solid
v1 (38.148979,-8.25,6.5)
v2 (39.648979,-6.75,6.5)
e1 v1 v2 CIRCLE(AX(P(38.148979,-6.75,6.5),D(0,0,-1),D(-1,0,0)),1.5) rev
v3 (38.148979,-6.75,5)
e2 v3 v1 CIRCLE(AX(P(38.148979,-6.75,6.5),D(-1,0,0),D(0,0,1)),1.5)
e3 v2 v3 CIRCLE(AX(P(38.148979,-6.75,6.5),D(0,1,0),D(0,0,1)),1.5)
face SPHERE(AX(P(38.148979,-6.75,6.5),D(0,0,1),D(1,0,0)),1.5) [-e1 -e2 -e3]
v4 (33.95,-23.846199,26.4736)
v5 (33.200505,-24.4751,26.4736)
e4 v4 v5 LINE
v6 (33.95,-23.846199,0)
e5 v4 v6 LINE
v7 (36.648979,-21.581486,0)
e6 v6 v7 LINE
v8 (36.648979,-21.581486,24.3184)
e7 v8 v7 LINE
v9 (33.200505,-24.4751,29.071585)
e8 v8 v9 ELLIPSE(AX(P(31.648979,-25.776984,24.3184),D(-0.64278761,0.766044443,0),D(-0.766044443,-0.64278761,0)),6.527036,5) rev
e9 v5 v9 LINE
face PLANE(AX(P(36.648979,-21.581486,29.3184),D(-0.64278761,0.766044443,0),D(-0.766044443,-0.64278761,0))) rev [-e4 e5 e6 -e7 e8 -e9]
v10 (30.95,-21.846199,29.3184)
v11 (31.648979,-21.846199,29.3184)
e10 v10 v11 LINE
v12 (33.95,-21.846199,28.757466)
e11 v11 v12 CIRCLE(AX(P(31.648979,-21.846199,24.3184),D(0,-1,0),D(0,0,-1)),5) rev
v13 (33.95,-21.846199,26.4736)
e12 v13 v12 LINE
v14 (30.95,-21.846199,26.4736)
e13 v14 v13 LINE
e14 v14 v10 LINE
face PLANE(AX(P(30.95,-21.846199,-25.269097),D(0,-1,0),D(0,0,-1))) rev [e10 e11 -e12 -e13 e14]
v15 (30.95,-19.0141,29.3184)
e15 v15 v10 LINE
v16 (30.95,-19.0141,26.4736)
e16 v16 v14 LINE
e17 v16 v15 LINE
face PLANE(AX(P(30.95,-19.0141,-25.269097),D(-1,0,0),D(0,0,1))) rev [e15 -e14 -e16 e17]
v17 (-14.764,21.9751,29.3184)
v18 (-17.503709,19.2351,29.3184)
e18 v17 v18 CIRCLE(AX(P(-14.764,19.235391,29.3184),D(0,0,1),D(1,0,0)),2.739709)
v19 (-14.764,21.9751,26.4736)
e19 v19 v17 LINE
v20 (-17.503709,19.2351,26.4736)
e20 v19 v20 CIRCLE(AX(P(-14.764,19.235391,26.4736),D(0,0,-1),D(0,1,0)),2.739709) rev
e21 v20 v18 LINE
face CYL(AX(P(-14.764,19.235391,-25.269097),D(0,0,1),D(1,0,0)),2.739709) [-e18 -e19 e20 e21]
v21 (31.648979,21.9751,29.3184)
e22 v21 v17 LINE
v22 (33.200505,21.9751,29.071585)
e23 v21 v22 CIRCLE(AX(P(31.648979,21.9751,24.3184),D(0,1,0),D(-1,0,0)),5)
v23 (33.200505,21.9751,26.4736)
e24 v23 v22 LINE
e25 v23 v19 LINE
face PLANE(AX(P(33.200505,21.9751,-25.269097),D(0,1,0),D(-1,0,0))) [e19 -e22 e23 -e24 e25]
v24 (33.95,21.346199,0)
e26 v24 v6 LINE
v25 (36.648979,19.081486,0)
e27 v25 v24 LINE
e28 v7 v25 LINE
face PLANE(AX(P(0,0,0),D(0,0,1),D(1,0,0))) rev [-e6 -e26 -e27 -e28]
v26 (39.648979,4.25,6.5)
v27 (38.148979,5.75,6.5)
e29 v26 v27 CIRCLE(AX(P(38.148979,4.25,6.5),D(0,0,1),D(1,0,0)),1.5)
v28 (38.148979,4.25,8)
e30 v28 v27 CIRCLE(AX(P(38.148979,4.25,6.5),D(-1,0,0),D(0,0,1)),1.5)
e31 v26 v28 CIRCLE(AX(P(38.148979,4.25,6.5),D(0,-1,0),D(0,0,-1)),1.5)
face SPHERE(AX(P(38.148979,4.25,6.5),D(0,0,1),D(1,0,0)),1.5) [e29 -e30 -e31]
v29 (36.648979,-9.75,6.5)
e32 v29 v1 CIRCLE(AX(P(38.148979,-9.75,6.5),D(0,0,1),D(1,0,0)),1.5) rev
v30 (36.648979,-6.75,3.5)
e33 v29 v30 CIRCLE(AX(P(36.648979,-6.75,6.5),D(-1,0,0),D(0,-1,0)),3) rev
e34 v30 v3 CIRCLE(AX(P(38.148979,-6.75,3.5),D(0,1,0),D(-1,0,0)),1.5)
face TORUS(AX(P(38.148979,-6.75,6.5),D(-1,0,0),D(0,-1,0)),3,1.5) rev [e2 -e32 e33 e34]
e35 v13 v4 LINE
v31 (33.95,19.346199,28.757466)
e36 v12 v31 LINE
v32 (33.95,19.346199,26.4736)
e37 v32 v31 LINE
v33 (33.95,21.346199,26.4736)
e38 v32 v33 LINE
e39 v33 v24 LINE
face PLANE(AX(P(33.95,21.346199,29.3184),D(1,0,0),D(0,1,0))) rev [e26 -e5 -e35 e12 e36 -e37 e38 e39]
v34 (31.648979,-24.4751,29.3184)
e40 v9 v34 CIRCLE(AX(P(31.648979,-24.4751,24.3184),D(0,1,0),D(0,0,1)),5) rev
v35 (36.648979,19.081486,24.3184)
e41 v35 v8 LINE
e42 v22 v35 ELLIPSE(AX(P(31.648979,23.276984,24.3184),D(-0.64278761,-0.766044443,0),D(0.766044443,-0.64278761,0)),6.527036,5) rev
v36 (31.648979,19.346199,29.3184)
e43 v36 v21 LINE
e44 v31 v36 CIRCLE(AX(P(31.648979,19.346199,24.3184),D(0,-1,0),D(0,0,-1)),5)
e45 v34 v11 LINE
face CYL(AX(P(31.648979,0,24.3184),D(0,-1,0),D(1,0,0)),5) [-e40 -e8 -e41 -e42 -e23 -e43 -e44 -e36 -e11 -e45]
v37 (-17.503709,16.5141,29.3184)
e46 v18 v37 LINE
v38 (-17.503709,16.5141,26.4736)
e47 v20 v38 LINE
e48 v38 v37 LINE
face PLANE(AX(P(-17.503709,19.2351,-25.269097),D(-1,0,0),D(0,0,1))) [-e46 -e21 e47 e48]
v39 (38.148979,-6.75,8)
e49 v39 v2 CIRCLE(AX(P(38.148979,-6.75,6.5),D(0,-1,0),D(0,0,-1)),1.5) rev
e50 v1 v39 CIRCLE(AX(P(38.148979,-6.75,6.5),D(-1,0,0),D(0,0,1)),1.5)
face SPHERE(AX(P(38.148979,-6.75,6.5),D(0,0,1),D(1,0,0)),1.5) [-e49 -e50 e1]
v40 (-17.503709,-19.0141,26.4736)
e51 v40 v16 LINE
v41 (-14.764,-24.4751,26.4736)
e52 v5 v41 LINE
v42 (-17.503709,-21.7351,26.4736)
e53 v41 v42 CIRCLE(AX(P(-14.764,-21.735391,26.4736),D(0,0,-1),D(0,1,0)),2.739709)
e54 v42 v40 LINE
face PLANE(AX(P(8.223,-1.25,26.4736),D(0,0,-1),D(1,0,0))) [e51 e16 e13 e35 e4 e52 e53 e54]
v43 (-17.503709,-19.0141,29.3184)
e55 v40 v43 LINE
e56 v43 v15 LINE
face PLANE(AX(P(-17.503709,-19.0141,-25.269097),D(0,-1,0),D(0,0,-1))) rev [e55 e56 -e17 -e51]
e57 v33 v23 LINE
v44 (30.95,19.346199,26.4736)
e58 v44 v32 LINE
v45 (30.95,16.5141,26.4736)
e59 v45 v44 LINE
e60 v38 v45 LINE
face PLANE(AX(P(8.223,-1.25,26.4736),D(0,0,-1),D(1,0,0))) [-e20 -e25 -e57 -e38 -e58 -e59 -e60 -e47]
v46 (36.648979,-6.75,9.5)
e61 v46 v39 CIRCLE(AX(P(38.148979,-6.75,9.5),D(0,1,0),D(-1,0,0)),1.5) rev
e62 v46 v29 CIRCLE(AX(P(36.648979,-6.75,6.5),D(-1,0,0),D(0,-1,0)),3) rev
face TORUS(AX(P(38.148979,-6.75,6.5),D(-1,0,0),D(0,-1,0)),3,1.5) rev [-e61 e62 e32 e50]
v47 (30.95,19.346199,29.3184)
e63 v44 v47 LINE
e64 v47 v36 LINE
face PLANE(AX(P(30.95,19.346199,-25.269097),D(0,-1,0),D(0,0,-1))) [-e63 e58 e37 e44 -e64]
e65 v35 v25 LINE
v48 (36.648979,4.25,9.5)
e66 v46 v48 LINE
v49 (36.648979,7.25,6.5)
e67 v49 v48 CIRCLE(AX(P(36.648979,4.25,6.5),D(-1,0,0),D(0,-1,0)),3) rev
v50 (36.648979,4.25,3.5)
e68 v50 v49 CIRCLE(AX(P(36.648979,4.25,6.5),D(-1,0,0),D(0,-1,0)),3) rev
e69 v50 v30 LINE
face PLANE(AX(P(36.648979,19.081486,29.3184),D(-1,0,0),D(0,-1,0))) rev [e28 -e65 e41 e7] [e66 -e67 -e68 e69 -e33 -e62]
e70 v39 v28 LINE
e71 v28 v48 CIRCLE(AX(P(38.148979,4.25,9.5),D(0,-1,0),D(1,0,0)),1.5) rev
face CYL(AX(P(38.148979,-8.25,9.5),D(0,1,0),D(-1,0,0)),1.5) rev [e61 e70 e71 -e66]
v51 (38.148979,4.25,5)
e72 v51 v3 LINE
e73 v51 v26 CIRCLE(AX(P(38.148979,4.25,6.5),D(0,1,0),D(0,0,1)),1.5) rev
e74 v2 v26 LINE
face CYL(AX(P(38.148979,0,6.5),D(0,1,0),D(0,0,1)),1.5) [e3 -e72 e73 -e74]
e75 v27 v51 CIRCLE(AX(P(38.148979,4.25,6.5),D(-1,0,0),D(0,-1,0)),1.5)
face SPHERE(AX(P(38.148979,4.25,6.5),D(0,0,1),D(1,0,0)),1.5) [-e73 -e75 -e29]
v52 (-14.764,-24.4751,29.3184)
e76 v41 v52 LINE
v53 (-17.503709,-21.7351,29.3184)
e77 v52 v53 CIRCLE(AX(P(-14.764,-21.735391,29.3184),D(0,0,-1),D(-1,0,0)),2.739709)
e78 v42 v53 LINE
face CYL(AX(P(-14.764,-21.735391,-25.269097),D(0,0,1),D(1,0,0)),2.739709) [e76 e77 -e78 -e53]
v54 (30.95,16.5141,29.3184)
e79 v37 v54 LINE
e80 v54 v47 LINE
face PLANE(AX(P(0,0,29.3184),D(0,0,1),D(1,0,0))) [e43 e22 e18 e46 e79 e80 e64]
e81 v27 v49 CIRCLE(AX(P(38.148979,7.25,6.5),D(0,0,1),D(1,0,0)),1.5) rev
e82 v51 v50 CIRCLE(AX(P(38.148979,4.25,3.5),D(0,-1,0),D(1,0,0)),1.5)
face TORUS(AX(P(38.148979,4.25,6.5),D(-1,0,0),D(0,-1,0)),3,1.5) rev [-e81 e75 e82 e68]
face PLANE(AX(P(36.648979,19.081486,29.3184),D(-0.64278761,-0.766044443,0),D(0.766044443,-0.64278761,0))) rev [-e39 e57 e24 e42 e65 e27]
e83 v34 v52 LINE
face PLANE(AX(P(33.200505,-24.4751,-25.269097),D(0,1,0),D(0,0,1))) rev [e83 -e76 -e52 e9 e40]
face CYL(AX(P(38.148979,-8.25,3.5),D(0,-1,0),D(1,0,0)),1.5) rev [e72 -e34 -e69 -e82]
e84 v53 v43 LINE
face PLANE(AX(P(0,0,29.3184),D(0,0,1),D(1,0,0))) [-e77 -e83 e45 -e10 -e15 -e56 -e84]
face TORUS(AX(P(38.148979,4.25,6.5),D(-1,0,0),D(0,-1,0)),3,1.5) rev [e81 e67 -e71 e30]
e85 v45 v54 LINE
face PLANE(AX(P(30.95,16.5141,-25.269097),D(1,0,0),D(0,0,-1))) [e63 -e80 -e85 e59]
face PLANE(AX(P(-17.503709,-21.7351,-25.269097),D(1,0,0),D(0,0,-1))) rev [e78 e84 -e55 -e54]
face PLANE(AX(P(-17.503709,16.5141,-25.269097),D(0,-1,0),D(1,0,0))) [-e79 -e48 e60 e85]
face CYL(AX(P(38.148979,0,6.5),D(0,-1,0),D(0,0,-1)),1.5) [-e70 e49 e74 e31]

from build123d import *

# Parameters (mm, degrees)
BOSS_EXTRUDE1_DEPTH = 29.3184
BOSS_EXTRUDE2_DEPTH = 2.8448
FILLET1_R           = 5
SKETCH3_W           = 3
SKETCH3_H           = 14
BOSS_EXTRUDE3_DEPTH = 3
FILLET2_R           = 1.5
FILLET3_R           = 1.5


# Some blends are built 0.0001 mm under size
with BuildPart() as part:
    # Sketch1 → Boss-Extrude1 (new body)
    with BuildSketch(Plane.XY):
        Polygon((33.95, 21.346198616), (33.95, -23.846198616), (36.648979486, -21.581485925), (36.648979486, -1.25), (36.648979486, 19.081485925), align=None)
    extrude(amount=BOSS_EXTRUDE1_DEPTH)

    # Sketch2 → Boss-Extrude2 (add)
    with BuildSketch(Plane.XY.offset(29.3184)):
        with BuildLine():
            Line((33.95, -21.846198616), (33.95, -23.846198616))
            Line((33.95, -23.846198616), (33.200504516, -24.4751))
            Line((33.200504516, -24.4751), (-14.764, -24.4751))
            ThreePointArc((-14.764, -24.4751), (-16.701369719, -23.67255493), (-17.503709057, -21.7351))
            Line((-17.503709057, -21.7351), (-17.503709057, -19.0141))
            Line((-17.503709057, -19.0141), (30.95, -19.0141))
            Line((30.95, -19.0141), (30.95, -21.846198616))
            Line((30.95, -21.846198616), (33.95, -21.846198616))
        make_face()
        with BuildLine():
            Line((30.95, 19.346198616), (33.95, 19.346198616))
            Line((33.95, 19.346198616), (33.95, 21.346198616))
            Line((33.95, 21.346198616), (33.200504516, 21.9751))
            Line((33.200504516, 21.9751), (-14.764, 21.9751))
            ThreePointArc((-14.764, 21.9751), (-16.701369719, 21.17255493), (-17.503709057, 19.2351))
            Line((-17.503709057, 19.2351), (-17.503709057, 16.5141))
            Line((-17.503709057, 16.5141), (30.95, 16.5141))
            Line((30.95, 16.5141), (30.95, 19.346198616))
        make_face()
    extrude(amount=-BOSS_EXTRUDE2_DEPTH)

    # Fillet1
    # the kernel refuses this fillet: 5 mm, written as the material it takes off along each edge
    with BuildSketch(Plane(origin=(36.648979486, 31.581485925, 29.3184), x_dir=(0, 0, -1), z_dir=(0, -1, 0))) as fillet1_piece_1:
        with BuildLine():
            CenterArc((FILLET1_R, -FILLET1_R), FILLET1_R, 90, 90)
            Line((0, -FILLET1_R), (0, 0))
            Line((0, 0), (FILLET1_R, 0))
        make_face()
    extrude(amount=65.66297185, mode=Mode.SUBTRACT)

    # Sketch3 → Boss-Extrude3 (add)
    with BuildSketch(Plane(origin=(36.648979486, 0, 0), x_dir=(0, 0, -1), z_dir=(1, 0, 0))):
        with Locations((-6.5, -1.25)):
            Rectangle(SKETCH3_W, SKETCH3_H)
    extrude(amount=BOSS_EXTRUDE3_DEPTH)

    # Fillet2
    fillet2_edges = [part.edges().sort_by_distance(p)[0] for p in [
        (39.648979486, -1.25, 8),
        (39.648979486, -8.25, 6.5),
        (39.648979486, -1.25, 5),
        (39.648979486, 5.75, 6.5),
    ]]
    fillet(fillet2_edges, radius=FILLET2_R - 0.0001)  # a hair under: the kernel refuses the full size

    # Fillet3
    # the kernel refuses this fillet: 1.5 mm, written as the material it takes off along each edge
    with BuildSketch(Plane(origin=(39.648979486, -6.75, 6.5), x_dir=(0, -1, 0), z_dir=(0, 0, 1))) as fillet3_piece_1:
        with BuildLine():
            CenterArc((0.0001, -1.4999), 1.4999, 0, 90)
            Line((1.5, -1.4999), (1.5, 0))
            Line((1.5, 0), (0.0001, 0))
        make_face()
    revolve(axis=Axis((39.648979486, -6.75, 6.5), (1, 0, 0)), revolution_arc=90, mode=Mode.SUBTRACT)
    with BuildSketch(Plane(origin=(39.648979486, -6.75, 6.5), x_dir=(0, 0, 1), z_dir=(0, 1, 0))) as fillet3_piece_2:
        with BuildLine():
            CenterArc((0.0001, -1.4999), 1.4999, 0, 90)
            Line((1.5, -1.4999), (1.5, 0))
            Line((1.5, 0), (0.0001, 0))
        make_face()
    revolve(axis=Axis((39.648979486, -6.75, 6.5), (1, 0, 0)), revolution_arc=90, mode=Mode.SUBTRACT)
    with BuildSketch(Plane(origin=(39.648979486, 4.25, 6.5), x_dir=(0, 0, -1), z_dir=(0, -1, 0))) as fillet3_piece_3:
        with BuildLine():
            CenterArc((0.0001, -1.4999), 1.4999, 0, 90)
            Line((1.5, -1.4999), (1.5, 0))
            Line((1.5, 0), (0.0001, 0))
        make_face()
    revolve(axis=Axis((39.648979486, 4.25, 6.5), (1, 0, 0)), revolution_arc=90, mode=Mode.SUBTRACT)
    with BuildSketch(Plane(origin=(39.648979486, 4.25, 6.5), x_dir=(0, 1, 0), z_dir=(0, 0, -1))) as fillet3_piece_4:
        with BuildLine():
            CenterArc((0.0001, -1.4999), 1.4999, 0, 90)
            Line((1.5, -1.4999), (1.5, 0))
            Line((1.5, 0), (0.0001, 0))
        make_face()
    revolve(axis=Axis((39.648979486, 4.25, 6.5), (1, 0, 0)), revolution_arc=90, mode=Mode.SUBTRACT)
    with BuildSketch(Plane(origin=(36.648979486, 5.75, 8), x_dir=(0, -1, 0), z_dir=(1, 0, 0)), Plane(origin=(36.648979486, 5.75, 5), x_dir=(0, 0, 1), z_dir=(1, 0, 0))) as fillet3_piece_5:
        with BuildLine():
            CenterArc((FILLET3_R, FILLET3_R), FILLET3_R, 180, 90)
            Line((0, FILLET3_R), (-FILLET3_R * 0.02, FILLET3_R))
            Line((-FILLET3_R * 0.02, FILLET3_R), (-FILLET3_R * 0.02, -FILLET3_R * 0.02))
            Line((-FILLET3_R * 0.02, -FILLET3_R * 0.02), (FILLET3_R, -FILLET3_R * 0.02))
            Line((FILLET3_R, -FILLET3_R * 0.02), (FILLET3_R, 0))
        make_face()
    extrude(amount=3, mode=Mode.SUBTRACT)
    with BuildSketch(Plane(origin=(36.648979486, -8.25, 5), x_dir=(0, 0, 1), z_dir=(1, 0, 0)), Plane(origin=(36.648979486, -8.25, 8), x_dir=(0, 1, 0), z_dir=(1, 0, 0))) as fillet3_piece_6:
        with BuildLine():
            CenterArc((FILLET3_R, -FILLET3_R), FILLET3_R, 90, 90)
            Line((0, -FILLET3_R), (-FILLET3_R * 0.02, -FILLET3_R))
            Line((-FILLET3_R * 0.02, -FILLET3_R), (-FILLET3_R * 0.02, FILLET3_R * 0.02))
            Line((-FILLET3_R * 0.02, FILLET3_R * 0.02), (FILLET3_R, FILLET3_R * 0.02))
            Line((FILLET3_R, FILLET3_R * 0.02), (FILLET3_R, 0))
        make_face()
    extrude(amount=3, mode=Mode.SUBTRACT)
    fillet3_2_edges = [part.edges().sort_by_distance(p)[0] for p in [
        (36.648979486, -1.25, 8),
        (36.648979486, -1.25, 5),
    ]]
    fillet(fillet3_2_edges, radius=FILLET3_R)


solid = part.part
